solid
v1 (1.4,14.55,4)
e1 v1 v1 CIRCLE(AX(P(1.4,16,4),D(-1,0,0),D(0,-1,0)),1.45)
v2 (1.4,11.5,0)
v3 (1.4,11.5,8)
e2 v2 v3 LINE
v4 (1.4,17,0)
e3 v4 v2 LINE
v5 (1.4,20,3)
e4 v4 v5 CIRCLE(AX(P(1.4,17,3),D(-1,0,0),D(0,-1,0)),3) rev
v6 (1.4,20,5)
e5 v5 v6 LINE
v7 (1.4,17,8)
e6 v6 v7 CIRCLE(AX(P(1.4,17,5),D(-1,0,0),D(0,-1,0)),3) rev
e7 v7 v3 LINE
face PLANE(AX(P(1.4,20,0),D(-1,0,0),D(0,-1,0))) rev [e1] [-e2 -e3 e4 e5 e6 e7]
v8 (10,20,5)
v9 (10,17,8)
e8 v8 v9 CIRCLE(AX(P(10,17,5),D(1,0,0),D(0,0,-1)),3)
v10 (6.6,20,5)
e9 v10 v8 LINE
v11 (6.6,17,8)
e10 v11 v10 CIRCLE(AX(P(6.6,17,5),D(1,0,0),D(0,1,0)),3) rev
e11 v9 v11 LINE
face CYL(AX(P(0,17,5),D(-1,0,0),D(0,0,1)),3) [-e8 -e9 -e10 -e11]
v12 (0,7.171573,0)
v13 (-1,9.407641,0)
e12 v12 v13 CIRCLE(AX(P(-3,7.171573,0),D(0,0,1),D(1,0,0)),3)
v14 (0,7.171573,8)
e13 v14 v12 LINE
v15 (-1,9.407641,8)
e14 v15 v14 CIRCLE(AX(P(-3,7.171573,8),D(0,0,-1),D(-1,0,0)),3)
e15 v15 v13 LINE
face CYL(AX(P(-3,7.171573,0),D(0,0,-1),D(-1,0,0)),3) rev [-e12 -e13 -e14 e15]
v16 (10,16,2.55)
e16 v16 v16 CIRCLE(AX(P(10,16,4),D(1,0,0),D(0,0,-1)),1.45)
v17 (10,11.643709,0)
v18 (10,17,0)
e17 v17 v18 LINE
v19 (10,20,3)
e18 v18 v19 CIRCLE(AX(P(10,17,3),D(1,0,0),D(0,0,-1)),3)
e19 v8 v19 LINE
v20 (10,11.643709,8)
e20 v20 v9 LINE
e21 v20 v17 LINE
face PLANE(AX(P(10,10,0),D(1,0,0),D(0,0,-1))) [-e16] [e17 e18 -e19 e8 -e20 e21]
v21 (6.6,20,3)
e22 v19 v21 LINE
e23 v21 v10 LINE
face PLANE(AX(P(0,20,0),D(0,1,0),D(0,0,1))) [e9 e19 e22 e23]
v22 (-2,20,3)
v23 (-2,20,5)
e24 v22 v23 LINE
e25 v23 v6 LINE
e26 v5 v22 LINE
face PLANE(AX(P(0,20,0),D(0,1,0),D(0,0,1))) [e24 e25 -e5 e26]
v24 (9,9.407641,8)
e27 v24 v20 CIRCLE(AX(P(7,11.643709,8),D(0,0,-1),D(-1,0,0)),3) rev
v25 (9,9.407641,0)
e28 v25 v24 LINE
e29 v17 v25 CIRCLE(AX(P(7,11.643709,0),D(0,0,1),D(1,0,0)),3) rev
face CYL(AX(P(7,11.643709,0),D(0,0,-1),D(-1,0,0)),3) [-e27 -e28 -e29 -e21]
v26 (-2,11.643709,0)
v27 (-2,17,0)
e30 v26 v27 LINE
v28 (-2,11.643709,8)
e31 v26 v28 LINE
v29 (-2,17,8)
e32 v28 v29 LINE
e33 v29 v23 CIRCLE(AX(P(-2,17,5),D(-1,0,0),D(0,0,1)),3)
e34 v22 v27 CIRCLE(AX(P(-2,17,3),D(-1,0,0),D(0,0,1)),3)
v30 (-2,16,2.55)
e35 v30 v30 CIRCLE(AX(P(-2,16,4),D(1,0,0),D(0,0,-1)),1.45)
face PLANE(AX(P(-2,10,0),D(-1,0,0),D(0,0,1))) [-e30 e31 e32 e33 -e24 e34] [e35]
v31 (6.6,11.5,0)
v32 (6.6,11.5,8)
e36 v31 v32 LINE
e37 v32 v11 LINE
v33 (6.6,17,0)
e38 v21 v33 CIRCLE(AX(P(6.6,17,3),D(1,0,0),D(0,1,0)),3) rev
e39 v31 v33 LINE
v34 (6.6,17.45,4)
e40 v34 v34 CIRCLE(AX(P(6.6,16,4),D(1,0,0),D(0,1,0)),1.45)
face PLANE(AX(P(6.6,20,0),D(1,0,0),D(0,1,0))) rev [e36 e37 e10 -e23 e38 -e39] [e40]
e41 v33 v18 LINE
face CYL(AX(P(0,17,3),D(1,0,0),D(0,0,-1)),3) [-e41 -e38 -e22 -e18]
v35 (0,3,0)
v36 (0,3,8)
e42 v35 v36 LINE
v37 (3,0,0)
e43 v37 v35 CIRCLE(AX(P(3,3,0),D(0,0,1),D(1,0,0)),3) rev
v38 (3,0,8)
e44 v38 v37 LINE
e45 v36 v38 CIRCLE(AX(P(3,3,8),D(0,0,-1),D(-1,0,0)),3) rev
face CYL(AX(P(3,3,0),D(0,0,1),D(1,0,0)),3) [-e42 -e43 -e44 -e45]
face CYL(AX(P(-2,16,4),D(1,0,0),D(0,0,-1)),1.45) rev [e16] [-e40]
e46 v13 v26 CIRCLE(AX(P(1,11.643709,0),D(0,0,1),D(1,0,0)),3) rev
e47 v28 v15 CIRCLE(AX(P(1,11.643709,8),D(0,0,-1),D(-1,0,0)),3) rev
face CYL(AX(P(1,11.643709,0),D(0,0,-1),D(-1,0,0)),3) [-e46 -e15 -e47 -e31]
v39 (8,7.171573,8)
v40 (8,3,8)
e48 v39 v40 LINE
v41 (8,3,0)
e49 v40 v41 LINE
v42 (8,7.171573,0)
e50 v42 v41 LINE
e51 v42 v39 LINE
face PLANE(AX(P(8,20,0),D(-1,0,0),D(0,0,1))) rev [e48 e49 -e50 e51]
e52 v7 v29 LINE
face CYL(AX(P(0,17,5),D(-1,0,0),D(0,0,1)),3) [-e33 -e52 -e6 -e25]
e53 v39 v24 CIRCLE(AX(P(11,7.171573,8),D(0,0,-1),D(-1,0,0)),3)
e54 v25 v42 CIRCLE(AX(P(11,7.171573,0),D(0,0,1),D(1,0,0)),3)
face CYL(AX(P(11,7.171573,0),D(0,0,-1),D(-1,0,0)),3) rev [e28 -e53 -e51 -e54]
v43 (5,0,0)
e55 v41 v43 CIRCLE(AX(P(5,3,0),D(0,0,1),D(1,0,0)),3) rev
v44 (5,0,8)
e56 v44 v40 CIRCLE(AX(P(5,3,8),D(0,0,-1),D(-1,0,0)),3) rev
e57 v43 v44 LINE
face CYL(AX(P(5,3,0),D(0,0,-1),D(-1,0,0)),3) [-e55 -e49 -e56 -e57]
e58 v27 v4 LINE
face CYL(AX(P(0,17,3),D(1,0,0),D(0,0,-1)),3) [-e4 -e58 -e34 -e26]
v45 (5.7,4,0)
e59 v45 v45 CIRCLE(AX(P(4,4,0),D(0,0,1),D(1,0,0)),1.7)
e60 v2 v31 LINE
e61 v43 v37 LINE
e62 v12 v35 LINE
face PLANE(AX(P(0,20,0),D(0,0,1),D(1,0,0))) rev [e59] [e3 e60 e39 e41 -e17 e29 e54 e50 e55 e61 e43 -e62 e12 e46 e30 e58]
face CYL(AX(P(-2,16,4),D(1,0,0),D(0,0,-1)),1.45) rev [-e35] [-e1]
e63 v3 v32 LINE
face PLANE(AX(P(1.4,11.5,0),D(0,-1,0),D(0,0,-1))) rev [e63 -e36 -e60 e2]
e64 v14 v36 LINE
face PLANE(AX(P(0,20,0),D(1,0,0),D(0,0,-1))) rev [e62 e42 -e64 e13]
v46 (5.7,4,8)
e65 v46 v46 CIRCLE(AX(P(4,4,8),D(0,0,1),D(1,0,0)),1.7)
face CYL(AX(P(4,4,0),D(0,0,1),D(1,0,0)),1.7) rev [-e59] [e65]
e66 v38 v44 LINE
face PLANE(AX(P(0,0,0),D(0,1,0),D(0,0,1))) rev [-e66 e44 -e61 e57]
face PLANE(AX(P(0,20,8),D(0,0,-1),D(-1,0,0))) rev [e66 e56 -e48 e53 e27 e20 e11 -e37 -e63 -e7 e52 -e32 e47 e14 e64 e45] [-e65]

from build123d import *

# Parameters (mm, degrees)
SKETCH_1_W          = 8
SKETCH_1_H          = 8
EXTRUDE_1_DEPTH     = 20
SKETCH_2_R          = 1.7
CUT_EXTRUDE_1_DEPTH = 23.978250586
SKETCH_4_W          = 2
SKETCH_4_H          = 8
EXTRUDE_3_DEPTH     = 10
SKETCH_5_W          = 5.2
SKETCH_5_H          = 8.5
CUT_EXTRUDE_2_DEPTH = 24.748684174
FILLET_1_R          = 3
SKETCH_6_R          = 1.45
CUT_EXTRUDE_3_DEPTH = 25.657656012
FILLET_2_R          = 3


with BuildPart() as part:
    # 草图1 → 凸台-拉伸1 (new body)
    with BuildSketch(Plane(origin=(0, 0, 0), x_dir=(1, 0, 0), z_dir=(0, 1, 0))):
        with Locations((4, -4)):
            Rectangle(SKETCH_1_W, SKETCH_1_H)
    extrude(amount=EXTRUDE_1_DEPTH)

    # 草图2 → 切除-拉伸1 (cut, through all)
    with BuildSketch(Plane.XY.offset(8)):
        with Locations((4, 4)):
            Circle(SKETCH_2_R)
    extrude(amount=-CUT_EXTRUDE_1_DEPTH, mode=Mode.SUBTRACT)

    # 草图4 → 凸台-拉伸3 (add)
    with BuildSketch(Plane(origin=(0, 20, 0), x_dir=(1, 0, 0), z_dir=(0, 1, 0))):
        with Locations((-1, -4)):
            Rectangle(SKETCH_4_W, SKETCH_4_H)
        with Locations((9, -4)):
            Rectangle(SKETCH_4_W, SKETCH_4_H)
    extrude(amount=-EXTRUDE_3_DEPTH)

    # 草图5 → 切除-拉伸2 (cut, through all)
    with BuildSketch(Plane.XY.offset(8)):
        with Locations((4, 15.75)):
            Rectangle(SKETCH_5_W, SKETCH_5_H)
    extrude(amount=-CUT_EXTRUDE_2_DEPTH, mode=Mode.SUBTRACT)

    # 圆角1
    # the kernel refuses this fillet: 3 mm, written as the material it adds along each edge
    with BuildSketch(Plane(origin=(8, 10, 8), x_dir=(0, -1, 0), z_dir=(0, 0, -1))) as fillet_1_piece_1:
        with BuildLine():
            CenterArc((2.828427125, -3), FILLET_1_R, 90, 70.528779366)
            Line((0, -2), (-0.056568542, -1.98))
            ThreePointArc((-0.056568542, -1.98), (-0.06, -1), (-0.06, 0))
            Line((-0.06, 0), (0, 0.06))
            Line((0, 0.06), (2.828427125, 0.06))
            Line((2.828427125, 0.06), (2.828427125, 0))
        make_face()
    extrude(amount=8)
    with BuildSketch(Plane(origin=(0, 10, 8), x_dir=(-1, 0, 0), z_dir=(0, 0, -1))) as fillet_1_piece_2:
        with BuildLine():
            CenterArc((3, -2.828427125), FILLET_1_R, 109.471220634, 70.528779366)
            Line((0, -2.828427125), (-0.06, -2.828427125))
            Line((-0.06, -2.828427125), (-0.06, 0))
            Line((-0.06, 0), (0, 0.06))
            ThreePointArc((0, 0.06), (1, 0.06), (1.98, 0.056568542))
            Line((1.98, 0.056568542), (2, 0))
        make_face()
    extrude(amount=8)

    # 草图6 → 切除-拉伸3 (cut, through all)
    with BuildSketch(Plane(origin=(10, 0, 0), x_dir=(0, 0, -1), z_dir=(1, 0, 0))):
        with Locations((-4, 16)):
            Circle(SKETCH_6_R)
    extrude(amount=-CUT_EXTRUDE_3_DEPTH, mode=Mode.SUBTRACT)

    # 圆角2
    fillet_2_edges = [part.edges().sort_by_distance(p)[0] for p in [
        (8.3, 20, 0),
        (-2, 10, 4),
        (10, 10, 4),
        (-0.3, 20, 0),
        (8.3, 20, 8),
        (8, 0, 4),
        (0, 0, 4),
        (-0.3, 20, 8),
    ]]
    fillet(fillet_2_edges, radius=FILLET_2_R)


solid = part.part
